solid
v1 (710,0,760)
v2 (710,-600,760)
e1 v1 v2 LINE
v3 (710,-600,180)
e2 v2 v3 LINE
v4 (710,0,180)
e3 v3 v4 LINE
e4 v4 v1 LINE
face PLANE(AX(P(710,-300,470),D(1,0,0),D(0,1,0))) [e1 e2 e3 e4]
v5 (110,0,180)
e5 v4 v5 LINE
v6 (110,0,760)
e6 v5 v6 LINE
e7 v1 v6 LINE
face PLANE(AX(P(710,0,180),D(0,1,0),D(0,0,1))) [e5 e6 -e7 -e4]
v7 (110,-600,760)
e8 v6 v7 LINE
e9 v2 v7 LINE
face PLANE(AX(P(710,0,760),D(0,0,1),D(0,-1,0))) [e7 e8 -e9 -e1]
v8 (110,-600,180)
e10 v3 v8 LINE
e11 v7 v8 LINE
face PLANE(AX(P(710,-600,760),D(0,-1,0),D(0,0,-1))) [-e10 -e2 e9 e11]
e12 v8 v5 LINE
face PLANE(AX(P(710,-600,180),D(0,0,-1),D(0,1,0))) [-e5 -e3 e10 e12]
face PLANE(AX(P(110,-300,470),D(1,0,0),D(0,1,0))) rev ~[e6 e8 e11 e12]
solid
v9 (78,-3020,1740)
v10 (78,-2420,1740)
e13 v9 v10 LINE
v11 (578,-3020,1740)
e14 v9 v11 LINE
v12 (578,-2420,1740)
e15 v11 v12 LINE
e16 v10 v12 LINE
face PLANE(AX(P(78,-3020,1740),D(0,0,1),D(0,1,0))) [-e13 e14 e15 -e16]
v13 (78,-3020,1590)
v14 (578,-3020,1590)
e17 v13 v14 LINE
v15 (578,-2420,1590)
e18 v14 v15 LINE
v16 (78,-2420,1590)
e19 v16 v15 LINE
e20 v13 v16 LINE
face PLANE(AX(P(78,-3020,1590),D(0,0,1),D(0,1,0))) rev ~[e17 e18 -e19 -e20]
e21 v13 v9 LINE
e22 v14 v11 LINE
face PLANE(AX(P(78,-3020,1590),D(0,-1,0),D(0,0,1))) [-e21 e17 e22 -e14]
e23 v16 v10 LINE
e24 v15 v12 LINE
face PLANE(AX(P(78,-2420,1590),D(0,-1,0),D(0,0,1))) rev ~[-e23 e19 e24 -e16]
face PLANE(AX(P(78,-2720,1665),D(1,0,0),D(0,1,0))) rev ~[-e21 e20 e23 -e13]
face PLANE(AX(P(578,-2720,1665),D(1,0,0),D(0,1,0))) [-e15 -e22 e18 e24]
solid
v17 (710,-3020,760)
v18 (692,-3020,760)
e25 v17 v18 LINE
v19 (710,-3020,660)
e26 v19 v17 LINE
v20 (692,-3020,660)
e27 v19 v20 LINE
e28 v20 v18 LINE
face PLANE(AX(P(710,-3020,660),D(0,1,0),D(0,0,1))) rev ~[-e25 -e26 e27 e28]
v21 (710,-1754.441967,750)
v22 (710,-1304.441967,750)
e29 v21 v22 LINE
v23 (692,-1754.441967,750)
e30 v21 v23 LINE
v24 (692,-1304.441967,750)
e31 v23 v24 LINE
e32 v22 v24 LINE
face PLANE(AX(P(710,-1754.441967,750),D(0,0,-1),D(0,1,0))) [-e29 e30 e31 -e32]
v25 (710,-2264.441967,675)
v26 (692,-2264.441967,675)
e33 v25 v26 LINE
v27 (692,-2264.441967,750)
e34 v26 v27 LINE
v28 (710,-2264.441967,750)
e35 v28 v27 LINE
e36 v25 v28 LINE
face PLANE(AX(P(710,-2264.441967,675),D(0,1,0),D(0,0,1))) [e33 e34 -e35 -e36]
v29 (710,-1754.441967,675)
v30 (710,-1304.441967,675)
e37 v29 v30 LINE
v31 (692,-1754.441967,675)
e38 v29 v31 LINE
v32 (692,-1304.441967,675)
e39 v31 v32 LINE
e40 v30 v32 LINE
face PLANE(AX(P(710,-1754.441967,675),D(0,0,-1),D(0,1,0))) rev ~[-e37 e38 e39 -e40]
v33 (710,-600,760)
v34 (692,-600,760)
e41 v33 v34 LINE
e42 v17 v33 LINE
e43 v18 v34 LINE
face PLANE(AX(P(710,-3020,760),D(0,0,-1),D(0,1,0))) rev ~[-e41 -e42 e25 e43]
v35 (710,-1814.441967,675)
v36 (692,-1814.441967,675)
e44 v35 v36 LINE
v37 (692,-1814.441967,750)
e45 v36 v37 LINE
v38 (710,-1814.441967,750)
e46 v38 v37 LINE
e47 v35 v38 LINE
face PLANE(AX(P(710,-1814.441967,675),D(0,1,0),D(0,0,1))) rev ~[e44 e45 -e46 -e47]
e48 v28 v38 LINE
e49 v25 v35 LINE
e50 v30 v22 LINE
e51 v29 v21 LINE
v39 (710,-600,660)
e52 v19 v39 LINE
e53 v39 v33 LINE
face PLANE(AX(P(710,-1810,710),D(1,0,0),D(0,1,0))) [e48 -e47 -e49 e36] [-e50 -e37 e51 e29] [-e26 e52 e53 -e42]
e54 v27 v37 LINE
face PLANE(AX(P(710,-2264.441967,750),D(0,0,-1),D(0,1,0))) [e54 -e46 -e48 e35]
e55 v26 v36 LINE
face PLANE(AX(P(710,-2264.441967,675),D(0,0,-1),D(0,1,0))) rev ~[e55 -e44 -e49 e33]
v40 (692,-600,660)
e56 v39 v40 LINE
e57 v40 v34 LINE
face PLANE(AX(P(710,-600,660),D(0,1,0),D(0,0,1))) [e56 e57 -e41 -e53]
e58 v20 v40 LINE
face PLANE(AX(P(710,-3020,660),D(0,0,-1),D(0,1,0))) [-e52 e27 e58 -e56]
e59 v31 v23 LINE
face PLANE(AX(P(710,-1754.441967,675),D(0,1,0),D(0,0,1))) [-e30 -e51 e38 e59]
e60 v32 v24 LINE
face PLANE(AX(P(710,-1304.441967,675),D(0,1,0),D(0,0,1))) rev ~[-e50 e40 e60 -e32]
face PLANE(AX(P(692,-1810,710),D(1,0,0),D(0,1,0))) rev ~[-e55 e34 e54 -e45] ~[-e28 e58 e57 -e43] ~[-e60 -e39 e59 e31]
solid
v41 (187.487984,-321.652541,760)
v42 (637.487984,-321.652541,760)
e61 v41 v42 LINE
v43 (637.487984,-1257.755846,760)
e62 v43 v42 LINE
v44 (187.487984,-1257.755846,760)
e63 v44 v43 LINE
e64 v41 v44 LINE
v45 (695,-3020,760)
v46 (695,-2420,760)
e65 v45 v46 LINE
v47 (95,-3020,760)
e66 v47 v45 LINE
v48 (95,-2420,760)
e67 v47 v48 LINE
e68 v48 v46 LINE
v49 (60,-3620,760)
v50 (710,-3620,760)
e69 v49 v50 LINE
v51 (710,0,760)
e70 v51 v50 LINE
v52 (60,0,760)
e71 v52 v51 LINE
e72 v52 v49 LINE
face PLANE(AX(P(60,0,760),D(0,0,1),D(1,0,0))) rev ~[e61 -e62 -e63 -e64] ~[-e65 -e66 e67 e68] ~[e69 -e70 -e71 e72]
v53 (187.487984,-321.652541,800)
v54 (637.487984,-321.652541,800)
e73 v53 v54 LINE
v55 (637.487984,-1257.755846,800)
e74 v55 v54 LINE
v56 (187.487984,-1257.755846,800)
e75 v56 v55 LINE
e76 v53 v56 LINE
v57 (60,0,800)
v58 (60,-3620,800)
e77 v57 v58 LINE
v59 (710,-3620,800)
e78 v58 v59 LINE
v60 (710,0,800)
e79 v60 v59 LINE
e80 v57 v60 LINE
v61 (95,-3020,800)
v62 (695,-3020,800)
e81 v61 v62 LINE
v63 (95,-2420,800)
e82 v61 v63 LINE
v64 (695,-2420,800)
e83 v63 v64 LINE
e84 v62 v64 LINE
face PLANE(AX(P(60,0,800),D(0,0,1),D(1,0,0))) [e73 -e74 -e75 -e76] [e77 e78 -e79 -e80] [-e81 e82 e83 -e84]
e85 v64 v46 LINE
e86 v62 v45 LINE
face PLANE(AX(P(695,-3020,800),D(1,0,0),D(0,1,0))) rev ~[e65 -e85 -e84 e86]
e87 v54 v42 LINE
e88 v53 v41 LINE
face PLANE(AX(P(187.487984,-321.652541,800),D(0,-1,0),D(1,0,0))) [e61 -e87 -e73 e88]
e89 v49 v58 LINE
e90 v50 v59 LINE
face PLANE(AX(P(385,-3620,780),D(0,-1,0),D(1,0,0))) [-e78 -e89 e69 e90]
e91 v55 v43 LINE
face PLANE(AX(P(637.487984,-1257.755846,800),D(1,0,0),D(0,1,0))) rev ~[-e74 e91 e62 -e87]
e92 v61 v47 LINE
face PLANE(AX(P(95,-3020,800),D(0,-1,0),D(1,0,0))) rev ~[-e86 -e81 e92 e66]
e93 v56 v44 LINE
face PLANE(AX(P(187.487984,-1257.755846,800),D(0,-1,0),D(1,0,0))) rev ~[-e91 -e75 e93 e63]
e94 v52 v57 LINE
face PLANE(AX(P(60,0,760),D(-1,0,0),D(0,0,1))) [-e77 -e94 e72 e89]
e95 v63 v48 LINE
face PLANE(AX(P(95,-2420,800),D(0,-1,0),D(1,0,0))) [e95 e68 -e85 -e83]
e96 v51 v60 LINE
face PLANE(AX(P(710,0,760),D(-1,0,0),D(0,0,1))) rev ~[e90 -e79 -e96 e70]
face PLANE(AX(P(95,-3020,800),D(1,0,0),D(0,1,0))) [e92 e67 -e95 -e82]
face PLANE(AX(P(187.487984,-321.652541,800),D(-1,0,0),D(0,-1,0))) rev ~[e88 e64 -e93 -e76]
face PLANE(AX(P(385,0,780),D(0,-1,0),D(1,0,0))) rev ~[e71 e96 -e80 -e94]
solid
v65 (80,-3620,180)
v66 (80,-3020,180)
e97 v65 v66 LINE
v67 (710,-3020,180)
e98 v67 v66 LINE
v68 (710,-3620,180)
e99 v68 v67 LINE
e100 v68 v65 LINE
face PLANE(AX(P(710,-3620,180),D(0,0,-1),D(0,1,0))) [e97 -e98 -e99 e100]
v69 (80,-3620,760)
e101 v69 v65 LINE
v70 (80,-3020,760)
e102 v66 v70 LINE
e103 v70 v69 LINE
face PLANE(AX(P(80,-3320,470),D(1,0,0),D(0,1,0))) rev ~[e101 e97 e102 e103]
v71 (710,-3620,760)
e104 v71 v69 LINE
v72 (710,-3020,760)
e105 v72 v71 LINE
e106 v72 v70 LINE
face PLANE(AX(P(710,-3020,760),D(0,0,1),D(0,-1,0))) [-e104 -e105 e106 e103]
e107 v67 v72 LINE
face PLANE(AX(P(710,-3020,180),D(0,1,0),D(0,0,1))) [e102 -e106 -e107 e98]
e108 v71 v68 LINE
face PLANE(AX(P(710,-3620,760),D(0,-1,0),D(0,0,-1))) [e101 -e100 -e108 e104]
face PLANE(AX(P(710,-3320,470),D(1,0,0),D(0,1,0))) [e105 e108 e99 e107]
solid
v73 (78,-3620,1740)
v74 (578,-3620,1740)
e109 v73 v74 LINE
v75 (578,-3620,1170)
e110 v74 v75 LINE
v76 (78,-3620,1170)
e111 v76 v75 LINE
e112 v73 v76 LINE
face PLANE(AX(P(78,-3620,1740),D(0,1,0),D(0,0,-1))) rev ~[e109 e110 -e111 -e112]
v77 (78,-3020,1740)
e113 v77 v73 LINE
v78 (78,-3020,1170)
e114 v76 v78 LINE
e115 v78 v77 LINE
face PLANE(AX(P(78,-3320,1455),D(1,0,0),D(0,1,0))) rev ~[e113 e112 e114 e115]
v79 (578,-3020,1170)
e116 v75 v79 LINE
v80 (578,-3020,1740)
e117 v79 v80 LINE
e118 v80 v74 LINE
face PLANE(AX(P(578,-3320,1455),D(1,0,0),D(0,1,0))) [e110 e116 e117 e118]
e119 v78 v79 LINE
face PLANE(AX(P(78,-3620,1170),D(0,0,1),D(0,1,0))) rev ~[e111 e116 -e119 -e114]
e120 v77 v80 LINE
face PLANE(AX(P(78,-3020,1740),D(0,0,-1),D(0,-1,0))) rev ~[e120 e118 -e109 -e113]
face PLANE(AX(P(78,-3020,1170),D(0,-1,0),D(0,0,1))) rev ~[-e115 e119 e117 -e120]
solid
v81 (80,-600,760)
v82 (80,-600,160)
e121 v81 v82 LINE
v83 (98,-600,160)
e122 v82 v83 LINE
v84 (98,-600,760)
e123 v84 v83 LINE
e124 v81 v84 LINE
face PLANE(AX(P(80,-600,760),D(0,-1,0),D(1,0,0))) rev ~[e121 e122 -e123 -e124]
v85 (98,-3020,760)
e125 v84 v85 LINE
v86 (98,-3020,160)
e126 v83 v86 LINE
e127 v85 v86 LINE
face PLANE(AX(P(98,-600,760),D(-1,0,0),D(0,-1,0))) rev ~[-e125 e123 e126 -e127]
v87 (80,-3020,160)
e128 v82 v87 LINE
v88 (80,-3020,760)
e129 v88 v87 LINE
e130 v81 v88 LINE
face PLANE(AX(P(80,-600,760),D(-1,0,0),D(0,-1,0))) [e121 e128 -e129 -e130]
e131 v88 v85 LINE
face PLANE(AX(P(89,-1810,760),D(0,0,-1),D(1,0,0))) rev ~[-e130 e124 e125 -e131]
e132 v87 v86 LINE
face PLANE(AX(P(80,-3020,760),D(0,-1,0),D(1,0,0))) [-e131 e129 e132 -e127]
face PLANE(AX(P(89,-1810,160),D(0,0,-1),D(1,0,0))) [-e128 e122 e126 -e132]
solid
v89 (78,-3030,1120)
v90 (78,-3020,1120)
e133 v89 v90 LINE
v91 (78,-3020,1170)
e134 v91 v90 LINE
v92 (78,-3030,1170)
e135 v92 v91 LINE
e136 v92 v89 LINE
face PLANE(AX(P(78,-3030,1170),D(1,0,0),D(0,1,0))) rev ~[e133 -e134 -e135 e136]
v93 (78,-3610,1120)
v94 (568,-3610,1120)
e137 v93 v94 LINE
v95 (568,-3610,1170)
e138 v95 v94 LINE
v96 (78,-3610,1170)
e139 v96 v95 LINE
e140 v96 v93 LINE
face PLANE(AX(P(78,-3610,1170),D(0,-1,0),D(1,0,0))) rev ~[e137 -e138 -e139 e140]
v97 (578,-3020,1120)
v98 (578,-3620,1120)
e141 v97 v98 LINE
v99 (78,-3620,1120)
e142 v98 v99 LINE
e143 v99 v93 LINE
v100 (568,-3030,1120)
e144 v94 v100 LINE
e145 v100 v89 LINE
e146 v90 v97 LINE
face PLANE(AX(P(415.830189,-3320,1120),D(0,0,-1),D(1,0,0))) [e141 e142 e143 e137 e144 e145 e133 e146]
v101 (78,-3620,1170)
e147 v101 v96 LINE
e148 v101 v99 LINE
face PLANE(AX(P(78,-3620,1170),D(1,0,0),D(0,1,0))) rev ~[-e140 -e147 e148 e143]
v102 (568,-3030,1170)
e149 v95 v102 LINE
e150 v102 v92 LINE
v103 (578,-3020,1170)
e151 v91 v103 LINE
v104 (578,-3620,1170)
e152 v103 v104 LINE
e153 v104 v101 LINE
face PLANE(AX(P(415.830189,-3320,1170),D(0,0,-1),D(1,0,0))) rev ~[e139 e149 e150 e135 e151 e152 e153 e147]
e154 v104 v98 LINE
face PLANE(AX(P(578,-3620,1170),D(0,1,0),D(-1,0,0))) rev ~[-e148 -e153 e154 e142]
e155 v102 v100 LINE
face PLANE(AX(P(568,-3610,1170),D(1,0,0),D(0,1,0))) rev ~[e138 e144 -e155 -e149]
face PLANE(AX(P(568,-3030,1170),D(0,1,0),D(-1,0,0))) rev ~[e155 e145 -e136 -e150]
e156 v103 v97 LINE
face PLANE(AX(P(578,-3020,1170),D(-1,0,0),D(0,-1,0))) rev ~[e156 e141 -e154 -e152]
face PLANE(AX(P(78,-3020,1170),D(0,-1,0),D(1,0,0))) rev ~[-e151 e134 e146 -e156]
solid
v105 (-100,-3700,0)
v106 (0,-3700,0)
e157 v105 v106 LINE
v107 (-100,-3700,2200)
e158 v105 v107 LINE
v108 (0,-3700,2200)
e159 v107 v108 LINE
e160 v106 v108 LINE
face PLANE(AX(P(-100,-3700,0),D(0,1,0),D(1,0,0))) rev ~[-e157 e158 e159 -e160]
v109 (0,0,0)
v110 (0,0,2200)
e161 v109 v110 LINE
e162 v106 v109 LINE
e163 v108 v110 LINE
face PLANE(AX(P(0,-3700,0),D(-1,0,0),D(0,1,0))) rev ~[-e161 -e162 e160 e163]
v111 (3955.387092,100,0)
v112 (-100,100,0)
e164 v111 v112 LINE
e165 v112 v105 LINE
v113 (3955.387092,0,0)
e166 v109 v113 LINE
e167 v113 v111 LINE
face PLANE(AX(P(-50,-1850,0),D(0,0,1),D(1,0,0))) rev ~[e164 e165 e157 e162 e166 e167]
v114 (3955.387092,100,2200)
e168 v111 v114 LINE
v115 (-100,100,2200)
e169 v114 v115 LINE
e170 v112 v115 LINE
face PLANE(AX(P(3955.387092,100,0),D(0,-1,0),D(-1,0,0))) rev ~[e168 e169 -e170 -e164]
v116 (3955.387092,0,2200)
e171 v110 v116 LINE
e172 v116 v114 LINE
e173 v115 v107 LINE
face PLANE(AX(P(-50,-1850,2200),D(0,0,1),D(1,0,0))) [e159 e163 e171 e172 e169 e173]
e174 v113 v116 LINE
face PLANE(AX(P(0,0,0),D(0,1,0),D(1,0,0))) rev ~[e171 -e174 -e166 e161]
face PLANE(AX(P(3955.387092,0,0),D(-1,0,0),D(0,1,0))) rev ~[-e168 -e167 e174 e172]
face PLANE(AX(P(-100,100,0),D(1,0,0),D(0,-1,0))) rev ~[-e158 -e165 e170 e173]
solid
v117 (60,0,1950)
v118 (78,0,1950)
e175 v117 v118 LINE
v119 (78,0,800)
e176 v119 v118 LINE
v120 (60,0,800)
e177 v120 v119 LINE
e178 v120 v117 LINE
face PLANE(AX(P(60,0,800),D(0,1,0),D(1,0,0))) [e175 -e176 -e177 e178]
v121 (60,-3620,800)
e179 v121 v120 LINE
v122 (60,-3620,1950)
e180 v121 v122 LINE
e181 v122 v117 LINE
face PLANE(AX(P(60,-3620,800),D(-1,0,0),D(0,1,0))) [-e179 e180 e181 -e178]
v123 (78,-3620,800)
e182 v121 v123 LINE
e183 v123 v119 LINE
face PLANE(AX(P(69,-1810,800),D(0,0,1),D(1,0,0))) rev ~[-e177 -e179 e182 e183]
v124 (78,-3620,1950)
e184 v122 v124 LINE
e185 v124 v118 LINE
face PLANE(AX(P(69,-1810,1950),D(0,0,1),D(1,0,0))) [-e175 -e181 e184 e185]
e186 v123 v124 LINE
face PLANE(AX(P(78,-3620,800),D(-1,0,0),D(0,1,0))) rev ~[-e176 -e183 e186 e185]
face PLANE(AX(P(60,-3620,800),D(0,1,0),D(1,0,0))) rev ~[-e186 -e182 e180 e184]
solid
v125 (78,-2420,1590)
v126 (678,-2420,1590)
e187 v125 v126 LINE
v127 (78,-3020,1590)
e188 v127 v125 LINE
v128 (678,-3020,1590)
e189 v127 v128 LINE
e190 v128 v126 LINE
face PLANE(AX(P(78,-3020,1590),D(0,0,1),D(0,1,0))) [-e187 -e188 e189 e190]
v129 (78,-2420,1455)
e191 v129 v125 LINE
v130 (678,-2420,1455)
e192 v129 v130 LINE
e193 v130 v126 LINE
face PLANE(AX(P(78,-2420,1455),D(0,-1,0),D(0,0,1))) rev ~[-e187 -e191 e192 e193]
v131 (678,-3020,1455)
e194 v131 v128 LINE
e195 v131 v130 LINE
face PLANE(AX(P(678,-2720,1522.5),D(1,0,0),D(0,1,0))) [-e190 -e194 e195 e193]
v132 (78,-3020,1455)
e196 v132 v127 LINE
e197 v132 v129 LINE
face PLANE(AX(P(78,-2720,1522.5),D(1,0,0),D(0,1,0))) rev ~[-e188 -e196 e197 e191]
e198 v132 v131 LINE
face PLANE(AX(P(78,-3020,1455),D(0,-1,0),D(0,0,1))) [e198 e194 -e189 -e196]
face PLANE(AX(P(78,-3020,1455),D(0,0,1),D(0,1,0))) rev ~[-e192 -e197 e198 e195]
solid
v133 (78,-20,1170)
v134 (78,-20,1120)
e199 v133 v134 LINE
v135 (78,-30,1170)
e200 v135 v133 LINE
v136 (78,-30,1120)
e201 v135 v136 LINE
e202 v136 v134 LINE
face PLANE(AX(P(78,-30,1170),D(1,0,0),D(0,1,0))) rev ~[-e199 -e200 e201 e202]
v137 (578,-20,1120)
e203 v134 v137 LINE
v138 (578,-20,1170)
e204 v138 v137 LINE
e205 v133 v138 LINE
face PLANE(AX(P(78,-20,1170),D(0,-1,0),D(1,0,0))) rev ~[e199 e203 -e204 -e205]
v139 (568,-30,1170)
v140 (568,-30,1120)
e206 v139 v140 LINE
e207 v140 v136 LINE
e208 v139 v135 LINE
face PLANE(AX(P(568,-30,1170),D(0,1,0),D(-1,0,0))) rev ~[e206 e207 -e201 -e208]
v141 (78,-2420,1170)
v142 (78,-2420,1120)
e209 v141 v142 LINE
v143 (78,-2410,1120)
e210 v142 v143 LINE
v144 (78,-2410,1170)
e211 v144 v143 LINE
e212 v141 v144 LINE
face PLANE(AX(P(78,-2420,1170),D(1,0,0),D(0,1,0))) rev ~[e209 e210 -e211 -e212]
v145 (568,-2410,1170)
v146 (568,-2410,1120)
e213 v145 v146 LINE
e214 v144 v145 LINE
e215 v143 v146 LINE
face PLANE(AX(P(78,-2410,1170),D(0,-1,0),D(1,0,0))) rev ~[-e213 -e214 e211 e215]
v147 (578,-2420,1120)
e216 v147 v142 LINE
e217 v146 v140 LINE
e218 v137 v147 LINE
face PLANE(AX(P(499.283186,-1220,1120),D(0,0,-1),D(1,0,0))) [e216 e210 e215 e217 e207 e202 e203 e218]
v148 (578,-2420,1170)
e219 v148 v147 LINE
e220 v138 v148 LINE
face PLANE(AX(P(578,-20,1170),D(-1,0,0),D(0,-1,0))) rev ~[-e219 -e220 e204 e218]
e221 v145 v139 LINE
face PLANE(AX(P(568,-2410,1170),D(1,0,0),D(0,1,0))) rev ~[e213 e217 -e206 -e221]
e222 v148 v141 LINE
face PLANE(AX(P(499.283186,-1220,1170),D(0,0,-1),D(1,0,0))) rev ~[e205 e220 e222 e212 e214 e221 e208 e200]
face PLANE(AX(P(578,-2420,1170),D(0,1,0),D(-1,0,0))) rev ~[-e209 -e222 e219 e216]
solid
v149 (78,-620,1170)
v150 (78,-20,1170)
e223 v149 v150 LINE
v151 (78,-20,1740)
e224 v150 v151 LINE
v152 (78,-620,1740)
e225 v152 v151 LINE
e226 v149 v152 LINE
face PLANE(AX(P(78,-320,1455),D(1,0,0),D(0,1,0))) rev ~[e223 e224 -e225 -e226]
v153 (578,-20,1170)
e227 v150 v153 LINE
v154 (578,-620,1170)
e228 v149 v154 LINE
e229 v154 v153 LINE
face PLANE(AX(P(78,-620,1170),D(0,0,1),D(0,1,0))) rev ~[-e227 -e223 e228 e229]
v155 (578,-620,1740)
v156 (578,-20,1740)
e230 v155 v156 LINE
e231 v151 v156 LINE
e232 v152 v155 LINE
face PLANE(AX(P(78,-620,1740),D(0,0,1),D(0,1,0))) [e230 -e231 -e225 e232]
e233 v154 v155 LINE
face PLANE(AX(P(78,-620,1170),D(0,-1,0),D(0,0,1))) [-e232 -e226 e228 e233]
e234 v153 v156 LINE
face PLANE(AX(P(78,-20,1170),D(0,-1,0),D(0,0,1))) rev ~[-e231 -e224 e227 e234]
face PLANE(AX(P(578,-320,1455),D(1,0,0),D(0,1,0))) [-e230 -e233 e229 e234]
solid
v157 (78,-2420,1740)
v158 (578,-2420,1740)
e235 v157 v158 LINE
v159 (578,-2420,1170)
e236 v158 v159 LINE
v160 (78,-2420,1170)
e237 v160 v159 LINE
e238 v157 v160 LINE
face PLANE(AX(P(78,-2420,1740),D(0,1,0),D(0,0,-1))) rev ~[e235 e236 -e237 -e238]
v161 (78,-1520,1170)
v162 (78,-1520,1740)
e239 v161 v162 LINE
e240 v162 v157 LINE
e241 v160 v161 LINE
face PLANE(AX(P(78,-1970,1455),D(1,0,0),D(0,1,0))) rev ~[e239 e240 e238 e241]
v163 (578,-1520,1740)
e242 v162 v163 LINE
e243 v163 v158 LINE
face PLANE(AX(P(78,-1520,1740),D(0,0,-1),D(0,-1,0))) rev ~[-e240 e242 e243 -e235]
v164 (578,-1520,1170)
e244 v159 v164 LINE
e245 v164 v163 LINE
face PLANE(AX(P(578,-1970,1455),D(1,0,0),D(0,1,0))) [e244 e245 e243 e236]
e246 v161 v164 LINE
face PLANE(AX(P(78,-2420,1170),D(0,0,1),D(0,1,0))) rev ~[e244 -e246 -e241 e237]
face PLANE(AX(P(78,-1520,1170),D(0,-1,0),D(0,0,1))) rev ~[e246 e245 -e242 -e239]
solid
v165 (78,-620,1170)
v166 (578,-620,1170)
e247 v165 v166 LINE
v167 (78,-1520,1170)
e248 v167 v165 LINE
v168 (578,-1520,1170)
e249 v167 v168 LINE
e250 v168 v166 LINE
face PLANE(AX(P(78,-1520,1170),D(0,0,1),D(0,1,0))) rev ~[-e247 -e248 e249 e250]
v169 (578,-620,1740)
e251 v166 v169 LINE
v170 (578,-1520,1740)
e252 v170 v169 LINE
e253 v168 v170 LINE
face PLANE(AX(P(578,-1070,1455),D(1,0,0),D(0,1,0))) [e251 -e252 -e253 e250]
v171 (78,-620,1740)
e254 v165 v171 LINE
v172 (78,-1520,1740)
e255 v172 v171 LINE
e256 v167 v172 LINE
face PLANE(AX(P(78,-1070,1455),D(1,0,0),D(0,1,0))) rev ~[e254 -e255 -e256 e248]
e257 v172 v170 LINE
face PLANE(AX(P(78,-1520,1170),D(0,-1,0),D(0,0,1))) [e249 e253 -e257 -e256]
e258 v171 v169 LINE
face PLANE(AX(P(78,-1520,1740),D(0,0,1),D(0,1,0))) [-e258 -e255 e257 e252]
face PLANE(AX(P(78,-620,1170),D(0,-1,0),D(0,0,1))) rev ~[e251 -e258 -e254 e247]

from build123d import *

# Parameters (mm, degrees)
F0_W      = 100
F0_H      = 3700
F1_DEPTH  = 2200
F2_W      = 650
F2_H      = 40
F3_DEPTH  = 3620
F4_W      = 18
F4_H      = 3620
F5_DEPTH  = 1150
F7_DEPTH  = 500
F6_W      = 900
F6_H      = 570
F8_DEPTH  = 500
F9_DEPTH  = 500
F6_W_2    = 600
F10_DEPTH = 500
F12_DEPTH = 630
F13_DEPTH = 600
F11_W     = 2420
F11_H     = 100
F14_DEPTH = 18
F15_W     = 18
F15_H     = 2420
F16_DEPTH = 600
F6_H_2    = 150
F17_DEPTH = 500
F6_H_3    = 135
F18_DEPTH = 600
F20_DEPTH = 50
F22_DEPTH = 50
F23_W     = 450
F23_H     = 75
F24_DEPTH = 25
F25_W     = 600
F25_H     = 600
F25_W_2   = 450
F25_H_2   = 450
F25_H_3   = 36.1033052649
F26_DEPTH = 50


with BuildPart() as f1:
    # F0 (on Top) → F1 (new body)
    with BuildSketch(Plane.XY):
        with Locations((-50, -1850)):
            Rectangle(F0_W, F0_H)
        Polygon((-100, 0), (0, 0), (3955.3870921059, 0), (3955.3870921059, 100), (-100, 100), align=None)
    extrude(amount=F1_DEPTH)


with BuildPart() as f3:
    # F2 (on face) → F3 (new body)
    with BuildSketch(Plane.XZ):
        with Locations((385, 780)):
            Rectangle(F2_W, F2_H)
    extrude(amount=F3_DEPTH)

    # F25 (on face) → F26 (cut)
    with BuildSketch(Plane.XY.offset(800)):
        with Locations((395, -2720)):
            Rectangle(F25_W, F25_H)
        with Locations((412.4879837036, -1032.7558462404)):
            Rectangle(F25_W_2, F25_H_2)
        with Locations((412.4879837036, -789.7041936079)):
            Rectangle(F25_W_2, F25_H_3)
        with Locations((412.4879837036, -546.6525409754)):
            Rectangle(F25_W_2, F25_H_2)
    extrude(amount=-F26_DEPTH, mode=Mode.SUBTRACT)


with BuildPart() as f5:
    # F4 (on face) → F5 (new body)
    with BuildSketch(Plane.XY.offset(800)):
        with Locations((69, -1810)):
            Rectangle(F4_W, F4_H)
    extrude(amount=F5_DEPTH)


with BuildPart() as f7:
    # F6 (on face) → F7 (new body)
    with BuildSketch(Plane.YZ.offset(78)):
        Polygon((-3020, 1740), (-3620, 1740), (-3620, 1170), (-3020, 1170), (-3020, 1455), (-3020, 1590), align=None)
    extrude(amount=F7_DEPTH)


with BuildPart() as f8:
    # F6 (on face) → F8 (new body)
    with BuildSketch(Plane.YZ.offset(78)):
        with Locations((-1070, 1455)):
            Rectangle(F6_W, F6_H)
    extrude(amount=F8_DEPTH)


with BuildPart() as f9:
    # F6 (on face) → F9 (new body)
    with BuildSketch(Plane.YZ.offset(78)):
        Polygon((-1520, 1740), (-2420, 1740), (-2420, 1590), (-2420, 1455), (-2420, 1170), (-1520, 1170), align=None)
    extrude(amount=F9_DEPTH)


with BuildPart() as f10:
    # F6 (on face) → F10 (new body)
    with BuildSketch(Plane.YZ.offset(78)):
        with Locations((-320, 1455)):
            Rectangle(F6_W_2, F6_H)
    extrude(amount=F10_DEPTH)


with BuildPart() as f12:
    # F11 (on face) → F12 (new body)
    with BuildSketch(Plane.YZ.offset(710)):
        Polygon((-3020, 760), (-3620, 760), (-3620, 180), (-3020, 180), (-3020, 660), align=None)
    extrude(amount=-F12_DEPTH)


with BuildPart() as f13:
    # F11 (on face) → F13 (new body)
    with BuildSketch(Plane.YZ.offset(710)):
        Polygon((0, 760), (-600, 760), (-600, 660), (-600, 180), (0, 180), align=None)
    extrude(amount=-F13_DEPTH)


with BuildPart() as f14:
    # F11 (on face) → F14 (new body)
    with BuildSketch(Plane.YZ.offset(710)):
        with Locations((-1810, 710)):
            Rectangle(F11_W, F11_H)
    extrude(amount=-F14_DEPTH)

    # F23 (on face) → F24 (cut)
    with BuildSketch(Plane.YZ.offset(710)):
        with Locations((-1529.4419670105, 712.5)):
            Rectangle(F23_W, F23_H)
        with Locations((-2039.4419670105, 712.5)):
            Rectangle(F23_W, F23_H)
    extrude(amount=-F24_DEPTH, mode=Mode.SUBTRACT)


with BuildPart() as f16:
    # F15 (on face) → F16 (new body)
    with BuildSketch(Plane(origin=(0, 0, 760), x_dir=(1, 0, 0), z_dir=(0, 0, -1))):
        with Locations((89, 1810)):
            Rectangle(F15_W, F15_H)
    extrude(amount=F16_DEPTH)


with BuildPart() as f17:
    # F6 (on face) → F17 (new body)
    with BuildSketch(Plane.YZ.offset(78)):
        with Locations((-2720, 1665)):
            Rectangle(F6_W_2, F6_H_2)
    extrude(amount=F17_DEPTH)


with BuildPart() as f18:
    # F6 (on face) → F18 (new body)
    with BuildSketch(Plane.YZ.offset(78)):
        with Locations((-2720, 1522.5)):
            Rectangle(F6_W_2, F6_H_3)
    extrude(amount=F18_DEPTH)


with BuildPart() as f20:
    # F19 (on face) → F20 (new body)
    with BuildSketch(Plane(origin=(0, 0, 1170), x_dir=(1, 0, 0), z_dir=(0, 0, -1))):
        Polygon((578, 3620), (78, 3620), (78, 3610), (568, 3610), (568, 3030), (78, 3030), (78, 3020), (578, 3020), align=None)
    extrude(amount=F20_DEPTH)


with BuildPart() as f22:
    # F21 (on face) → F22 (new body)
    with BuildSketch(Plane(origin=(0, 0, 1170), x_dir=(1, 0, 0), z_dir=(0, 0, -1))):
        Polygon((578, 2420), (78, 2420), (78, 2410), (568, 2410), (568, 30), (78, 30), (78, 20), (578, 20), align=None)
    extrude(amount=F22_DEPTH)


solid = Compound([f1.part, f3.part, f5.part, f7.part, f8.part, f9.part, f10.part, f12.part, f13.part, f14.part, f16.part, f17.part, f18.part, f20.part, f22.part])
